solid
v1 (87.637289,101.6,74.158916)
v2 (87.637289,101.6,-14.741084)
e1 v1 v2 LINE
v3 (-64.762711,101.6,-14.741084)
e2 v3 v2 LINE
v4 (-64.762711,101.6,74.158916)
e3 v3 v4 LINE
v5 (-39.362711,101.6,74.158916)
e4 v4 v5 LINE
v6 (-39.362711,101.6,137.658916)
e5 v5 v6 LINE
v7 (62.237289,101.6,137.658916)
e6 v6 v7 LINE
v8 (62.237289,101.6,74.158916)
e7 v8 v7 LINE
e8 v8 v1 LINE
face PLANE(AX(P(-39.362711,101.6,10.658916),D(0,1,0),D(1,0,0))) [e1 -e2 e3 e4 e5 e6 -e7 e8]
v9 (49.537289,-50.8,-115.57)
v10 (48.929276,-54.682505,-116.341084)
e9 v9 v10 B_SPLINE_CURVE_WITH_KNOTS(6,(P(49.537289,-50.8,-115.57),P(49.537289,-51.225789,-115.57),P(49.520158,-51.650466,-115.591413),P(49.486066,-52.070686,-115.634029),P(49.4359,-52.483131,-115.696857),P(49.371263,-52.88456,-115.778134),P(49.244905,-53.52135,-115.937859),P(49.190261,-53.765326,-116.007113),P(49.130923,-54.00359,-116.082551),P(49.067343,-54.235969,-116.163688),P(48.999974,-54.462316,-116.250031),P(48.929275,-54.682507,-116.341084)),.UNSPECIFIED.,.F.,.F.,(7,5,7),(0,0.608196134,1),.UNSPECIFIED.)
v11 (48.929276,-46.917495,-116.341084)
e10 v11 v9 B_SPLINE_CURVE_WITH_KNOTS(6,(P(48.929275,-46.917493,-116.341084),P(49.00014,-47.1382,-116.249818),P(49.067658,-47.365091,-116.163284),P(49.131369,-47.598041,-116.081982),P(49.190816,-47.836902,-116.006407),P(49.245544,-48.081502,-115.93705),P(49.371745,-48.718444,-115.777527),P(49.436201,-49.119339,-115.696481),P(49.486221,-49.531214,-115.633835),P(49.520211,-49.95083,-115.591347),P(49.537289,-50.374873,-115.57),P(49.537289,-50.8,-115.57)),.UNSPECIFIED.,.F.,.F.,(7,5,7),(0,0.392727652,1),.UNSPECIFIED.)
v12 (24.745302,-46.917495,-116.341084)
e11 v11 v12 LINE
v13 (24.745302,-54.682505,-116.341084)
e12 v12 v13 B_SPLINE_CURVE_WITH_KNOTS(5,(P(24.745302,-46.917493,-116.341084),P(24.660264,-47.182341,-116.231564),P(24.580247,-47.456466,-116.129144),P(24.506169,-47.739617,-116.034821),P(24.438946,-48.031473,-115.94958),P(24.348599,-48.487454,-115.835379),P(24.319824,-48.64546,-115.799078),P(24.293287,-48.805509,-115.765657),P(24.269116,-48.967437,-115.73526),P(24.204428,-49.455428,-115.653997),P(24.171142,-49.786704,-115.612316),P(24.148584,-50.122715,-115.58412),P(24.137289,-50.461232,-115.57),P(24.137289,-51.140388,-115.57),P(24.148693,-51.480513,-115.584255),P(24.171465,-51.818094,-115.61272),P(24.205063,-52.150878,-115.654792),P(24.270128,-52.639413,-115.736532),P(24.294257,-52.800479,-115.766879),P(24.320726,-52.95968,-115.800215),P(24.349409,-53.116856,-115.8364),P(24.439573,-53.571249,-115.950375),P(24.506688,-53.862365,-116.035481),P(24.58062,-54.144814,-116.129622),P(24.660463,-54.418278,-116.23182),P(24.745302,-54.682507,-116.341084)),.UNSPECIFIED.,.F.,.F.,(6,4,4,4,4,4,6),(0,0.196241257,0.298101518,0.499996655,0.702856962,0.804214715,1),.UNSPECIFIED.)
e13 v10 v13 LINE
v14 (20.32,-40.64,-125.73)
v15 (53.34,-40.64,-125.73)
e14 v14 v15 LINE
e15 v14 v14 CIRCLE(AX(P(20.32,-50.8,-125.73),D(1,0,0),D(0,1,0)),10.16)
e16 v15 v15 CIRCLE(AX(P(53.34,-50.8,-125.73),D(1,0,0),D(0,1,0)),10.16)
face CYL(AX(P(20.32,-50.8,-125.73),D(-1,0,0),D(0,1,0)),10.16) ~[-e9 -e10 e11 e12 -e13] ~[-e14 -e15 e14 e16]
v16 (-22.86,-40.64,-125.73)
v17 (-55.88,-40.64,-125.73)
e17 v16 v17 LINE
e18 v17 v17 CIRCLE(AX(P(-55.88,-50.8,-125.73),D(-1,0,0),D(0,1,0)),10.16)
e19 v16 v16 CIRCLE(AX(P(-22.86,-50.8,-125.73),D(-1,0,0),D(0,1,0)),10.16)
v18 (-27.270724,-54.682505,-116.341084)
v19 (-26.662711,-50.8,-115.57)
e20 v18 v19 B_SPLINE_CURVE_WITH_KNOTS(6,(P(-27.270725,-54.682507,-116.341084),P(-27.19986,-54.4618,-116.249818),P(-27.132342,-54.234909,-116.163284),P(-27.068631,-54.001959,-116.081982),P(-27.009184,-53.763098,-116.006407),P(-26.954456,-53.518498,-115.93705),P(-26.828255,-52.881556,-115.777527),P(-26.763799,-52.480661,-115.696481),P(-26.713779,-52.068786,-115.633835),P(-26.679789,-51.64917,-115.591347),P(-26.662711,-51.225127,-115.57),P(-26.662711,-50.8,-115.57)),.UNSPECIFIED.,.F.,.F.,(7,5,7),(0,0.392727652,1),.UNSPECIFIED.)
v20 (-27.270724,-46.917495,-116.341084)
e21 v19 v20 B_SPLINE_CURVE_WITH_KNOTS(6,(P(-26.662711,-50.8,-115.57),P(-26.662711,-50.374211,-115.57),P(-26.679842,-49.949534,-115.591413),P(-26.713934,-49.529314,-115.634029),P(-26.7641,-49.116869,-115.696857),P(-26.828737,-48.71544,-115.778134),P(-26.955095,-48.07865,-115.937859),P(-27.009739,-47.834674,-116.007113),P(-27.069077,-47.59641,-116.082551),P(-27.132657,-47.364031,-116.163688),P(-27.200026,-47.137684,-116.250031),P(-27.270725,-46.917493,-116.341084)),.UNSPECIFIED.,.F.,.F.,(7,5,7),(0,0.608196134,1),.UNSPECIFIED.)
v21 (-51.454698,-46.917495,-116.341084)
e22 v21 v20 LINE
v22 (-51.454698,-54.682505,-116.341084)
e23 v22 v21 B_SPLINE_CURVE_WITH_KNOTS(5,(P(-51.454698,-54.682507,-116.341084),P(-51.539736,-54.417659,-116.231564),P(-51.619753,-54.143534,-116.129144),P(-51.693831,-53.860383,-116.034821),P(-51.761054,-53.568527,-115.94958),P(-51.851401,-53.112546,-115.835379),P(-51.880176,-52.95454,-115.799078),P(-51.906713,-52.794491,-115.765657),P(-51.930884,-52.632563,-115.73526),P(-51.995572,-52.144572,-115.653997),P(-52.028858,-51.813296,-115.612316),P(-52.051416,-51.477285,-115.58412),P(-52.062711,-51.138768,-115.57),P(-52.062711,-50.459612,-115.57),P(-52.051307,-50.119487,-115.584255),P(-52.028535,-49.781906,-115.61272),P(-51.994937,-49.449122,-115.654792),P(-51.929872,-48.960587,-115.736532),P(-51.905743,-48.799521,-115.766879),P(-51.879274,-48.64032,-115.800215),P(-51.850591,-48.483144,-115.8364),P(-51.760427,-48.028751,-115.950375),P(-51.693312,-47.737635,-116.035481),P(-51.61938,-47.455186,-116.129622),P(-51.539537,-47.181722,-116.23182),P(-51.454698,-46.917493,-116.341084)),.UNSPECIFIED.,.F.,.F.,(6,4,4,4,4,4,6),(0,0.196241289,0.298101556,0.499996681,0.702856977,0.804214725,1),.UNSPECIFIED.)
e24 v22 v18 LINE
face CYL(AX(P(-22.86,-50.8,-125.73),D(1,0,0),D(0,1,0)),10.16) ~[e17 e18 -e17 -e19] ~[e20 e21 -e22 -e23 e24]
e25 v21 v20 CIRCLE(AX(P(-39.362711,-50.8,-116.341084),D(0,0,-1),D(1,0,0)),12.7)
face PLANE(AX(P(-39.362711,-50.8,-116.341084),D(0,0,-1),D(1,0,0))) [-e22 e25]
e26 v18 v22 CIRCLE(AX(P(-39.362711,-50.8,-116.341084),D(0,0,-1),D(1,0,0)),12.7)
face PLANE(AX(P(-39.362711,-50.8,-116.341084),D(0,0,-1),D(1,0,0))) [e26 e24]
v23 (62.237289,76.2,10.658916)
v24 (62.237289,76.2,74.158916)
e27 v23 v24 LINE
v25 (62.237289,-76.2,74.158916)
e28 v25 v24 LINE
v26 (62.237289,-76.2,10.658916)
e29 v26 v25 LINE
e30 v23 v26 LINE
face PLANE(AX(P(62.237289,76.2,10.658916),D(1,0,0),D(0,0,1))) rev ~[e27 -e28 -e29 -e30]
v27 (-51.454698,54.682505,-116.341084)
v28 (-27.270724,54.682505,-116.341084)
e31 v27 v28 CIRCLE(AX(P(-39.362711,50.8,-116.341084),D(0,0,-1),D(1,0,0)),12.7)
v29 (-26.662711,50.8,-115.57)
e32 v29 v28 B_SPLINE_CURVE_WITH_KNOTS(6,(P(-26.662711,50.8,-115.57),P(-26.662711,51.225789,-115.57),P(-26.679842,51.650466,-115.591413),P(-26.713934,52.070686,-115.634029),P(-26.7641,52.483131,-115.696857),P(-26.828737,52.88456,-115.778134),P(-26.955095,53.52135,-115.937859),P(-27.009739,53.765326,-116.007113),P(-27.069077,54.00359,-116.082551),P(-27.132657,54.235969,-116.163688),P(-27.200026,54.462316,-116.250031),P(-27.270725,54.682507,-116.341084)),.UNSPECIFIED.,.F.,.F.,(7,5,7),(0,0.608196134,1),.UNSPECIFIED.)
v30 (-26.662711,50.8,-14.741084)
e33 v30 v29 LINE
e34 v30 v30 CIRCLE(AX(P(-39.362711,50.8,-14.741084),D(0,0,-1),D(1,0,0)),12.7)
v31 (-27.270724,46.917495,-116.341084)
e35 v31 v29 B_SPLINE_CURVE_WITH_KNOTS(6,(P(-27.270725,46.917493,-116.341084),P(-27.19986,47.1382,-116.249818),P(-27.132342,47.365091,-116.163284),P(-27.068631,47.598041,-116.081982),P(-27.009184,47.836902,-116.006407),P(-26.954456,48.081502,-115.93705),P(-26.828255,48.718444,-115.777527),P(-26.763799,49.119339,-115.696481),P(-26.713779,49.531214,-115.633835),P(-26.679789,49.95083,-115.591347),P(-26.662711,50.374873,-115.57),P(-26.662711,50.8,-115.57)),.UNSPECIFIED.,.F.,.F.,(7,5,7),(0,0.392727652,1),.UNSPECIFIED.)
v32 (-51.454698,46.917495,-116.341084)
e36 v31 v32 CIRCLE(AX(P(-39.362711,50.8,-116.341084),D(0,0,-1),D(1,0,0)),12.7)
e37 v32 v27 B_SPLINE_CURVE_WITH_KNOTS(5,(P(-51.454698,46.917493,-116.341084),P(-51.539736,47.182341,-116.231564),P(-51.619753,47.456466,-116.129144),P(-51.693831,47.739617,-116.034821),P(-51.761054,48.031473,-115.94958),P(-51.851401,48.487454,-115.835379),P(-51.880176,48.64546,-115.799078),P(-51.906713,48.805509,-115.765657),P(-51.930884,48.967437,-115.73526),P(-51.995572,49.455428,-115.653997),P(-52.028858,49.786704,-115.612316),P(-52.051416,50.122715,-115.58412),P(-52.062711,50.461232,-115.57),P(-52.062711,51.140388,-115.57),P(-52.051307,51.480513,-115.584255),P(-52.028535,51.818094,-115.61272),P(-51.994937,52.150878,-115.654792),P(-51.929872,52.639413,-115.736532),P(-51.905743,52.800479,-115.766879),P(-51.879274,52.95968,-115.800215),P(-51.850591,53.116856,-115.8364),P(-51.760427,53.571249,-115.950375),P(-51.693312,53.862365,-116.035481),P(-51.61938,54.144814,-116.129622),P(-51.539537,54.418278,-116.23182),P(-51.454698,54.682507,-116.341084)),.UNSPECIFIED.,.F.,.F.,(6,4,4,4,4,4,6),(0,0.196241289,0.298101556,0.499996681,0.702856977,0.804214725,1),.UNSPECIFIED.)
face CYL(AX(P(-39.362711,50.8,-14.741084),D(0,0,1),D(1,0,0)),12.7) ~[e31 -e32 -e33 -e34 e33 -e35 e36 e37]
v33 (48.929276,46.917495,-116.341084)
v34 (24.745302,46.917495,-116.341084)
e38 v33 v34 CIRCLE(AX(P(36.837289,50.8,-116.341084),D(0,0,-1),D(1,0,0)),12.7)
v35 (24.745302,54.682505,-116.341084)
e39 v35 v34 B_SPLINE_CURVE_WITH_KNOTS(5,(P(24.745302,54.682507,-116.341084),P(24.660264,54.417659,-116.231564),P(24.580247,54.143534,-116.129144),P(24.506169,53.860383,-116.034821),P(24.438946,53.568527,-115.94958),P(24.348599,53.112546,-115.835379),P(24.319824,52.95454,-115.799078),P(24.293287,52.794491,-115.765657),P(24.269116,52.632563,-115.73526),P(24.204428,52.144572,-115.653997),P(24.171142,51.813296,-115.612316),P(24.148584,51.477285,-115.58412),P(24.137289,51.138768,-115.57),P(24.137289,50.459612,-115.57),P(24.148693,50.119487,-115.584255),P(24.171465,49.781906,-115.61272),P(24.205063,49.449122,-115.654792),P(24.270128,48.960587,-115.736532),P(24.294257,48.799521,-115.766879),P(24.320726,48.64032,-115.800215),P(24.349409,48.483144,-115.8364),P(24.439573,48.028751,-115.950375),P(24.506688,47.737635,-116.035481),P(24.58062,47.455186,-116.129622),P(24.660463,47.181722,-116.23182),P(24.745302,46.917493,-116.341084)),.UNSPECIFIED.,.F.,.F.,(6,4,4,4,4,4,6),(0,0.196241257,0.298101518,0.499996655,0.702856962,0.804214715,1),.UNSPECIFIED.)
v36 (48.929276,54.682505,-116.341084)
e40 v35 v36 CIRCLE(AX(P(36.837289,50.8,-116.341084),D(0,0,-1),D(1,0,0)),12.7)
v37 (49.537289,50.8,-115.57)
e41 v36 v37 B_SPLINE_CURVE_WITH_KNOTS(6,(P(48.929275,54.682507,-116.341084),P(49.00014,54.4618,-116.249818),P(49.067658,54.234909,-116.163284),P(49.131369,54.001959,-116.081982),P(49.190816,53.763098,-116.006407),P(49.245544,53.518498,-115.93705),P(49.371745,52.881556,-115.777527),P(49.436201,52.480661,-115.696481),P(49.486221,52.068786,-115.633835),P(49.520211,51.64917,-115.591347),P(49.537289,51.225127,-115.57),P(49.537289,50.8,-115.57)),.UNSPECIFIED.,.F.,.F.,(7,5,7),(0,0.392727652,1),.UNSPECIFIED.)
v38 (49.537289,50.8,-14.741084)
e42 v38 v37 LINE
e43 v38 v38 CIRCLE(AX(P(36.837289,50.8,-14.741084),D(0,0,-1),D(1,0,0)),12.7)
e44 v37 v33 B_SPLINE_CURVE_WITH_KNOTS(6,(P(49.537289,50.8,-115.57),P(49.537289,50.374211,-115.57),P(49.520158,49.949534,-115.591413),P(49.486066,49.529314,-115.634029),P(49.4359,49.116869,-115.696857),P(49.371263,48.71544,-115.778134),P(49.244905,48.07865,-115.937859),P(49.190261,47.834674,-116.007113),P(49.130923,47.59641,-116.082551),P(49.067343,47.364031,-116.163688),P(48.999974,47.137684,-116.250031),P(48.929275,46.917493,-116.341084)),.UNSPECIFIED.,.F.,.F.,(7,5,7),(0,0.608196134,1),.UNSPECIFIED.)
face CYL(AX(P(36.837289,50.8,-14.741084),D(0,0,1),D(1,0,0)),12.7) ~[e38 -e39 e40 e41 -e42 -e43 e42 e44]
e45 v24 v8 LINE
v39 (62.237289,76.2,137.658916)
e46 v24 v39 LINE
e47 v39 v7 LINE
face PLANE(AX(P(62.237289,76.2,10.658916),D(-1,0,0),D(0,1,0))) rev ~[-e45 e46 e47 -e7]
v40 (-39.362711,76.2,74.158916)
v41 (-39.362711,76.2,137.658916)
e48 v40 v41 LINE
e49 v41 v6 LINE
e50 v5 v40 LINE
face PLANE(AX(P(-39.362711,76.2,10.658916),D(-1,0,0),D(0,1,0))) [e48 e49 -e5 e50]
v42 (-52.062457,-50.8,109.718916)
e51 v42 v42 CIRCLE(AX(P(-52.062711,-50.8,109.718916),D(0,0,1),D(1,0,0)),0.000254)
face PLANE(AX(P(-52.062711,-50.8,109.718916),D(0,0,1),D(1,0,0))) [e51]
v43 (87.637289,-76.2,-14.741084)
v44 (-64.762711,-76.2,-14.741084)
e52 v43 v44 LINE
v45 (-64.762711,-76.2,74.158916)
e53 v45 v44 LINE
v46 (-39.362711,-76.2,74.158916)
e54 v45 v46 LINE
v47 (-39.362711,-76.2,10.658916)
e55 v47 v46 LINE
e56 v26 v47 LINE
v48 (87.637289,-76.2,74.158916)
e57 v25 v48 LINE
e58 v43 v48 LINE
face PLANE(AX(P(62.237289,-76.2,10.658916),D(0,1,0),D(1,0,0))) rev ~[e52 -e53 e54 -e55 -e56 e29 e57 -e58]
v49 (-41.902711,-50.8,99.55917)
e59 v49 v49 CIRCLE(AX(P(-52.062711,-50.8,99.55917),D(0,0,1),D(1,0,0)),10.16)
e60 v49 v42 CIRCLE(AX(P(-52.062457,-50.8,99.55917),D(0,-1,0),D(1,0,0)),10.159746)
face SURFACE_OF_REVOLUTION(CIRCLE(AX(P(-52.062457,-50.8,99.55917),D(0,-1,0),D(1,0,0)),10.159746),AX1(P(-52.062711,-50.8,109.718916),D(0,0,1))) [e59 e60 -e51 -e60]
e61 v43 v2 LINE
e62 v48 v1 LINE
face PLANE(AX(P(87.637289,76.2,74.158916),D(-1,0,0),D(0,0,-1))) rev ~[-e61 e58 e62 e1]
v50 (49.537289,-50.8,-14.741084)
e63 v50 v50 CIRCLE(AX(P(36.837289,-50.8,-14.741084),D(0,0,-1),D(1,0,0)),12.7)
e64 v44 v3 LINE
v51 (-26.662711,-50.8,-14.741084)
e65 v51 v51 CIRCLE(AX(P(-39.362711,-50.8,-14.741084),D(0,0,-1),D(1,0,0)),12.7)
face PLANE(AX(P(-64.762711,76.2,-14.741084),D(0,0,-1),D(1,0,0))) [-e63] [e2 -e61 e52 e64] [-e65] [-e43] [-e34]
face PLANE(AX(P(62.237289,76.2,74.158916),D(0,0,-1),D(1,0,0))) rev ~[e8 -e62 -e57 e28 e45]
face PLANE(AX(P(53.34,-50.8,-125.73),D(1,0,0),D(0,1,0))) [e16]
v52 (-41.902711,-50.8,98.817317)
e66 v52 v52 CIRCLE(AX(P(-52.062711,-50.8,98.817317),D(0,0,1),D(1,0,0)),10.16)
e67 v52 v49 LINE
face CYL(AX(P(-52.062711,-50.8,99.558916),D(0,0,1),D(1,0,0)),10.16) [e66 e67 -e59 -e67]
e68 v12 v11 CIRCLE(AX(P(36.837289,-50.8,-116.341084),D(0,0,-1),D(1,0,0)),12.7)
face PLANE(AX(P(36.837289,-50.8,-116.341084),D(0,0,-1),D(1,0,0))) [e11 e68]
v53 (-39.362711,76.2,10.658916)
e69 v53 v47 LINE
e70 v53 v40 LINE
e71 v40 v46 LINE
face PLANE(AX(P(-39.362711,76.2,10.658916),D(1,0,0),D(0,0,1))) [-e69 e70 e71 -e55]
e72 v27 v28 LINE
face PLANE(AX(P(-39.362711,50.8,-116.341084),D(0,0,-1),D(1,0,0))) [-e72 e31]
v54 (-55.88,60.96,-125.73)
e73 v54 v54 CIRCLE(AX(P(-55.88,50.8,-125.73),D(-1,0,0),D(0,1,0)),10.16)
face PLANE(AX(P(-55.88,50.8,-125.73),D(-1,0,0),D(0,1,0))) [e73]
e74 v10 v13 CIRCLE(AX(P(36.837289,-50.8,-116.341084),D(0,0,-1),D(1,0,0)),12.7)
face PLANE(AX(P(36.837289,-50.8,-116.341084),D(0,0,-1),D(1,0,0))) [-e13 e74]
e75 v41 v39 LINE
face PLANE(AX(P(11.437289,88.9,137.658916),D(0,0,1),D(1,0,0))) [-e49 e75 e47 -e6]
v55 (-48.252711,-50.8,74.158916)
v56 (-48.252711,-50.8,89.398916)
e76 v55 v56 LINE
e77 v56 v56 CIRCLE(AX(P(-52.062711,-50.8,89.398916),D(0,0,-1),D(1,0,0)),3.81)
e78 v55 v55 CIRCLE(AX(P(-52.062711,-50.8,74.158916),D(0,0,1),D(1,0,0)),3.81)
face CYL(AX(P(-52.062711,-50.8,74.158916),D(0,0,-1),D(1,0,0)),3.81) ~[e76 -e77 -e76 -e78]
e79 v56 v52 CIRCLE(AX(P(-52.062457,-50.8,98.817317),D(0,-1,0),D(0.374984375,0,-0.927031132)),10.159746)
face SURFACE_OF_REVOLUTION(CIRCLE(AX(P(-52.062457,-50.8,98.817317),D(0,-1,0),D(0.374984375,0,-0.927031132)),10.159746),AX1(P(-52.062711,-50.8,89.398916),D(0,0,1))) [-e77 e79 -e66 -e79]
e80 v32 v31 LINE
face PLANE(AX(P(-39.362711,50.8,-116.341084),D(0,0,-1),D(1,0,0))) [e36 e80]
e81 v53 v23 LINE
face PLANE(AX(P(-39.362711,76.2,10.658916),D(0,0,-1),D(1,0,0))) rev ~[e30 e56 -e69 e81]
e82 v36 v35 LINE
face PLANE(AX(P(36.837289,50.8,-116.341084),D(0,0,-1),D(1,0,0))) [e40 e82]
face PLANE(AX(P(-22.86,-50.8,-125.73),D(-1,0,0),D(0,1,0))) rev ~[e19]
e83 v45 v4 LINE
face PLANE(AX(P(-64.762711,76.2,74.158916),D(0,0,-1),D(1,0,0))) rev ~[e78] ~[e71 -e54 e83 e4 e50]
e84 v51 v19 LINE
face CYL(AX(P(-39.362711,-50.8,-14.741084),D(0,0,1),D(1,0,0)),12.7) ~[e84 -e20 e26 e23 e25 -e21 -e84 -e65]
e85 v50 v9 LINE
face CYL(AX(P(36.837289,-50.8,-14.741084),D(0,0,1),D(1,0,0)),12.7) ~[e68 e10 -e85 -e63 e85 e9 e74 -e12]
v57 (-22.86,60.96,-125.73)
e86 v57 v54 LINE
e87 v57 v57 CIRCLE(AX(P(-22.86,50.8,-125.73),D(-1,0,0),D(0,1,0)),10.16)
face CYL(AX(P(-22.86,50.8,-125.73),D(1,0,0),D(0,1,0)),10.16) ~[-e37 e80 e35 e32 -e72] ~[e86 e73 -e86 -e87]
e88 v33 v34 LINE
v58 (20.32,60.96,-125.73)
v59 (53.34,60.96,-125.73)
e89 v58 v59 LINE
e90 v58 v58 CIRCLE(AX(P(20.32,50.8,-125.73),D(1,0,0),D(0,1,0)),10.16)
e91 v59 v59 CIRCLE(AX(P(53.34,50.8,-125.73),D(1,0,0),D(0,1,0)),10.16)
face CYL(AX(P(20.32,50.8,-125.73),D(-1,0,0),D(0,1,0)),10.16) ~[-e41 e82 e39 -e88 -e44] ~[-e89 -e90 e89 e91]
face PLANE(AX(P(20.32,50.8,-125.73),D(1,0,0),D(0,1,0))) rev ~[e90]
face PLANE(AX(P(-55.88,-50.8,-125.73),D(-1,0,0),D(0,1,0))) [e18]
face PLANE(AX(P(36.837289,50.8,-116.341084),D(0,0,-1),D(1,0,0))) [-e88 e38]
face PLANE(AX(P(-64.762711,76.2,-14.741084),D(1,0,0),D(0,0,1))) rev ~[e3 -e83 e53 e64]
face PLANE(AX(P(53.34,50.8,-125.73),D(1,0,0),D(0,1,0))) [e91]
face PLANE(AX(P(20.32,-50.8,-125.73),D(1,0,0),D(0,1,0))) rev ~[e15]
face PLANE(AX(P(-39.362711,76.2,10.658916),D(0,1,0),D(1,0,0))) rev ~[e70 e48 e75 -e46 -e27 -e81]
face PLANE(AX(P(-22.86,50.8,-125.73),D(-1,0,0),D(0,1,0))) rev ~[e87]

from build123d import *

# Parameters (mm, degrees)
F0_W      = 127
F0_H      = 25.4
F1_DEPTH  = 76.2
F2_R      = 12.7
F3_DEPTH  = 101.6
F5_START  = 20.32
F4_R      = 10.16
F5_DEPTH  = 33.02
F6_START  = 43.18
F5_FACE_R = 10.16
F6_DEPTH  = 33.02
F7_DEPTH  = 25.4
F8_W      = 25.4
F8_H      = 152.4
F9_DEPTH  = 63.5
F10_DEPTH = 25.4
F11_W     = 101.6
F11_H     = 25.4
F12_DEPTH = 127
F13_R     = 3.81
F14_DEPTH = 25.4
F15_R     = 10.16
F16_DEPTH = 10.16


# Not quite as in the source:
# - a fillet or chamfer that OpenCascade refuses, or shapes differently, is made with other operations: its cross-section is extruded or revolved along the edge and cut away or added


with BuildPart() as f1:
    # F0 (on Front) → F1 (new body, symmetric)
    with BuildSketch(Plane.XZ):
        with Locations((-1.2627113611, -2.0410835827)):
            Rectangle(F0_W, F0_H)
    extrude(amount=F1_DEPTH, both=True)

    # F2 (on face) → F3 (join)
    with BuildSketch(Plane(origin=(0, 0, -14.7410835827), x_dir=(1, 0, 0), z_dir=(0, 0, -1))):
        with Locations((-39.3627113611, 50.8)):
            Circle(F2_R)
        with Locations((36.8372886389, 50.8)):
            Circle(F2_R)
        with Locations((36.8372886389, -50.8)):
            Circle(F2_R)
        with Locations((-39.3627113611, -50.8)):
            Circle(F2_R)
    extrude(amount=F3_DEPTH)

    # F4 (on Right) → F5 (join)
    with BuildSketch(Plane.YZ.offset(F5_START)):
        with Locations((-50.8, -125.73)):
            Circle(F4_R)
        with Locations((50.8, -125.73)):
            Circle(F4_R)
    extrude(amount=F5_DEPTH)

    # F5_face (on face) → F6 (join)
    with BuildSketch(Plane(origin=(20.32, 50.8, -125.73), x_dir=(0, 1, 0), z_dir=(-1, 0, 0)).offset(F6_START)):
        Circle(F5_FACE_R)
        with Locations((-101.6, 0)):
            Circle(F5_FACE_R)
    extrude(amount=F6_DEPTH)

    # F7 (add): a face of the model
    f7_faces = [f1.faces().sort_by_distance(p)[0] for p in [
        (62.2372886389, 0, -2.0410835827),
    ]]
    extrude(f7_faces, amount=F7_DEPTH)

    # F8 (on face) → F9 (join)
    with BuildSketch(Plane.XY.offset(10.6589164173)):
        with Locations((74.9372886389, 0)):
            Rectangle(F8_W, F8_H)
        with Locations((-52.0627113611, 0)):
            Rectangle(F8_W, F8_H)
    extrude(amount=F9_DEPTH)

    # F10 (add): a face of the model
    f10_faces = [f1.faces().sort_by_distance(p)[0] for p in [
        (11.4372886389, 76.2, 8.8945760307),
    ]]
    extrude(f10_faces, amount=F10_DEPTH)

    # F11 (on face) → F12 (join)
    with BuildSketch(Plane.XY.offset(10.6589164173)):
        with Locations((11.4372886389, 88.9)):
            Rectangle(F11_W, F11_H)
    extrude(amount=F12_DEPTH)

    # F13 (on face) → F14 (join)
    with BuildSketch(Plane.XY.offset(74.1589164173)):
        with Locations((-52.0627113611, -50.8)):
            Circle(F13_R)
    extrude(amount=F14_DEPTH)

    # F15 (on face) → F16 (join, symmetric)
    with BuildSketch(Plane.XY.offset(99.5589164173)):
        with Locations((-52.0627113611, -50.8)):
            Circle(F15_R)
    extrude(amount=F16_DEPTH, both=True)

    # F17: fillet of radius 10.159746 on 2 edges, made by hand

    # F17_s1 → F17_t2 (revolve, cut)
    with BuildSketch(Plane.XZ.offset(50.8)):
        with BuildLine():
            ThreePointArc((-41.9027113611, 99.5591704173), (-44.8784320693, 106.7431957091), (-52.0624573611, 109.7189164173))
            Line((-52.0624573611, 109.7189164173), (-41.9027113611, 109.7189164173))
            Line((-41.9027113611, 109.7189164173), (-41.9027113611, 99.5591704173))
        make_face()
    revolve(axis=Axis((-52.0627113611, -50.8, 109.7189164173), (0, 0, 1)), mode=Mode.SUBTRACT)

    # F17_s3 → F17_t4 (revolve, cut)
    with BuildSketch(Plane.XZ.offset(50.8)):
        with BuildLine():
            ThreePointArc((-48.2527113611, 89.3989164173), (-43.6384888643, 93.1377755804), (-41.9027113611, 98.8173172476))
            Line((-41.9027113611, 98.8173172476), (-41.9027113611, 89.3989164173))
            Line((-41.9027113611, 89.3989164173), (-48.2527113611, 89.3989164173))
        make_face()
    revolve(axis=Axis((-52.0627113611, -50.8, 89.3989164173), (0, 0, 1)), mode=Mode.SUBTRACT)


solid = f1.part
